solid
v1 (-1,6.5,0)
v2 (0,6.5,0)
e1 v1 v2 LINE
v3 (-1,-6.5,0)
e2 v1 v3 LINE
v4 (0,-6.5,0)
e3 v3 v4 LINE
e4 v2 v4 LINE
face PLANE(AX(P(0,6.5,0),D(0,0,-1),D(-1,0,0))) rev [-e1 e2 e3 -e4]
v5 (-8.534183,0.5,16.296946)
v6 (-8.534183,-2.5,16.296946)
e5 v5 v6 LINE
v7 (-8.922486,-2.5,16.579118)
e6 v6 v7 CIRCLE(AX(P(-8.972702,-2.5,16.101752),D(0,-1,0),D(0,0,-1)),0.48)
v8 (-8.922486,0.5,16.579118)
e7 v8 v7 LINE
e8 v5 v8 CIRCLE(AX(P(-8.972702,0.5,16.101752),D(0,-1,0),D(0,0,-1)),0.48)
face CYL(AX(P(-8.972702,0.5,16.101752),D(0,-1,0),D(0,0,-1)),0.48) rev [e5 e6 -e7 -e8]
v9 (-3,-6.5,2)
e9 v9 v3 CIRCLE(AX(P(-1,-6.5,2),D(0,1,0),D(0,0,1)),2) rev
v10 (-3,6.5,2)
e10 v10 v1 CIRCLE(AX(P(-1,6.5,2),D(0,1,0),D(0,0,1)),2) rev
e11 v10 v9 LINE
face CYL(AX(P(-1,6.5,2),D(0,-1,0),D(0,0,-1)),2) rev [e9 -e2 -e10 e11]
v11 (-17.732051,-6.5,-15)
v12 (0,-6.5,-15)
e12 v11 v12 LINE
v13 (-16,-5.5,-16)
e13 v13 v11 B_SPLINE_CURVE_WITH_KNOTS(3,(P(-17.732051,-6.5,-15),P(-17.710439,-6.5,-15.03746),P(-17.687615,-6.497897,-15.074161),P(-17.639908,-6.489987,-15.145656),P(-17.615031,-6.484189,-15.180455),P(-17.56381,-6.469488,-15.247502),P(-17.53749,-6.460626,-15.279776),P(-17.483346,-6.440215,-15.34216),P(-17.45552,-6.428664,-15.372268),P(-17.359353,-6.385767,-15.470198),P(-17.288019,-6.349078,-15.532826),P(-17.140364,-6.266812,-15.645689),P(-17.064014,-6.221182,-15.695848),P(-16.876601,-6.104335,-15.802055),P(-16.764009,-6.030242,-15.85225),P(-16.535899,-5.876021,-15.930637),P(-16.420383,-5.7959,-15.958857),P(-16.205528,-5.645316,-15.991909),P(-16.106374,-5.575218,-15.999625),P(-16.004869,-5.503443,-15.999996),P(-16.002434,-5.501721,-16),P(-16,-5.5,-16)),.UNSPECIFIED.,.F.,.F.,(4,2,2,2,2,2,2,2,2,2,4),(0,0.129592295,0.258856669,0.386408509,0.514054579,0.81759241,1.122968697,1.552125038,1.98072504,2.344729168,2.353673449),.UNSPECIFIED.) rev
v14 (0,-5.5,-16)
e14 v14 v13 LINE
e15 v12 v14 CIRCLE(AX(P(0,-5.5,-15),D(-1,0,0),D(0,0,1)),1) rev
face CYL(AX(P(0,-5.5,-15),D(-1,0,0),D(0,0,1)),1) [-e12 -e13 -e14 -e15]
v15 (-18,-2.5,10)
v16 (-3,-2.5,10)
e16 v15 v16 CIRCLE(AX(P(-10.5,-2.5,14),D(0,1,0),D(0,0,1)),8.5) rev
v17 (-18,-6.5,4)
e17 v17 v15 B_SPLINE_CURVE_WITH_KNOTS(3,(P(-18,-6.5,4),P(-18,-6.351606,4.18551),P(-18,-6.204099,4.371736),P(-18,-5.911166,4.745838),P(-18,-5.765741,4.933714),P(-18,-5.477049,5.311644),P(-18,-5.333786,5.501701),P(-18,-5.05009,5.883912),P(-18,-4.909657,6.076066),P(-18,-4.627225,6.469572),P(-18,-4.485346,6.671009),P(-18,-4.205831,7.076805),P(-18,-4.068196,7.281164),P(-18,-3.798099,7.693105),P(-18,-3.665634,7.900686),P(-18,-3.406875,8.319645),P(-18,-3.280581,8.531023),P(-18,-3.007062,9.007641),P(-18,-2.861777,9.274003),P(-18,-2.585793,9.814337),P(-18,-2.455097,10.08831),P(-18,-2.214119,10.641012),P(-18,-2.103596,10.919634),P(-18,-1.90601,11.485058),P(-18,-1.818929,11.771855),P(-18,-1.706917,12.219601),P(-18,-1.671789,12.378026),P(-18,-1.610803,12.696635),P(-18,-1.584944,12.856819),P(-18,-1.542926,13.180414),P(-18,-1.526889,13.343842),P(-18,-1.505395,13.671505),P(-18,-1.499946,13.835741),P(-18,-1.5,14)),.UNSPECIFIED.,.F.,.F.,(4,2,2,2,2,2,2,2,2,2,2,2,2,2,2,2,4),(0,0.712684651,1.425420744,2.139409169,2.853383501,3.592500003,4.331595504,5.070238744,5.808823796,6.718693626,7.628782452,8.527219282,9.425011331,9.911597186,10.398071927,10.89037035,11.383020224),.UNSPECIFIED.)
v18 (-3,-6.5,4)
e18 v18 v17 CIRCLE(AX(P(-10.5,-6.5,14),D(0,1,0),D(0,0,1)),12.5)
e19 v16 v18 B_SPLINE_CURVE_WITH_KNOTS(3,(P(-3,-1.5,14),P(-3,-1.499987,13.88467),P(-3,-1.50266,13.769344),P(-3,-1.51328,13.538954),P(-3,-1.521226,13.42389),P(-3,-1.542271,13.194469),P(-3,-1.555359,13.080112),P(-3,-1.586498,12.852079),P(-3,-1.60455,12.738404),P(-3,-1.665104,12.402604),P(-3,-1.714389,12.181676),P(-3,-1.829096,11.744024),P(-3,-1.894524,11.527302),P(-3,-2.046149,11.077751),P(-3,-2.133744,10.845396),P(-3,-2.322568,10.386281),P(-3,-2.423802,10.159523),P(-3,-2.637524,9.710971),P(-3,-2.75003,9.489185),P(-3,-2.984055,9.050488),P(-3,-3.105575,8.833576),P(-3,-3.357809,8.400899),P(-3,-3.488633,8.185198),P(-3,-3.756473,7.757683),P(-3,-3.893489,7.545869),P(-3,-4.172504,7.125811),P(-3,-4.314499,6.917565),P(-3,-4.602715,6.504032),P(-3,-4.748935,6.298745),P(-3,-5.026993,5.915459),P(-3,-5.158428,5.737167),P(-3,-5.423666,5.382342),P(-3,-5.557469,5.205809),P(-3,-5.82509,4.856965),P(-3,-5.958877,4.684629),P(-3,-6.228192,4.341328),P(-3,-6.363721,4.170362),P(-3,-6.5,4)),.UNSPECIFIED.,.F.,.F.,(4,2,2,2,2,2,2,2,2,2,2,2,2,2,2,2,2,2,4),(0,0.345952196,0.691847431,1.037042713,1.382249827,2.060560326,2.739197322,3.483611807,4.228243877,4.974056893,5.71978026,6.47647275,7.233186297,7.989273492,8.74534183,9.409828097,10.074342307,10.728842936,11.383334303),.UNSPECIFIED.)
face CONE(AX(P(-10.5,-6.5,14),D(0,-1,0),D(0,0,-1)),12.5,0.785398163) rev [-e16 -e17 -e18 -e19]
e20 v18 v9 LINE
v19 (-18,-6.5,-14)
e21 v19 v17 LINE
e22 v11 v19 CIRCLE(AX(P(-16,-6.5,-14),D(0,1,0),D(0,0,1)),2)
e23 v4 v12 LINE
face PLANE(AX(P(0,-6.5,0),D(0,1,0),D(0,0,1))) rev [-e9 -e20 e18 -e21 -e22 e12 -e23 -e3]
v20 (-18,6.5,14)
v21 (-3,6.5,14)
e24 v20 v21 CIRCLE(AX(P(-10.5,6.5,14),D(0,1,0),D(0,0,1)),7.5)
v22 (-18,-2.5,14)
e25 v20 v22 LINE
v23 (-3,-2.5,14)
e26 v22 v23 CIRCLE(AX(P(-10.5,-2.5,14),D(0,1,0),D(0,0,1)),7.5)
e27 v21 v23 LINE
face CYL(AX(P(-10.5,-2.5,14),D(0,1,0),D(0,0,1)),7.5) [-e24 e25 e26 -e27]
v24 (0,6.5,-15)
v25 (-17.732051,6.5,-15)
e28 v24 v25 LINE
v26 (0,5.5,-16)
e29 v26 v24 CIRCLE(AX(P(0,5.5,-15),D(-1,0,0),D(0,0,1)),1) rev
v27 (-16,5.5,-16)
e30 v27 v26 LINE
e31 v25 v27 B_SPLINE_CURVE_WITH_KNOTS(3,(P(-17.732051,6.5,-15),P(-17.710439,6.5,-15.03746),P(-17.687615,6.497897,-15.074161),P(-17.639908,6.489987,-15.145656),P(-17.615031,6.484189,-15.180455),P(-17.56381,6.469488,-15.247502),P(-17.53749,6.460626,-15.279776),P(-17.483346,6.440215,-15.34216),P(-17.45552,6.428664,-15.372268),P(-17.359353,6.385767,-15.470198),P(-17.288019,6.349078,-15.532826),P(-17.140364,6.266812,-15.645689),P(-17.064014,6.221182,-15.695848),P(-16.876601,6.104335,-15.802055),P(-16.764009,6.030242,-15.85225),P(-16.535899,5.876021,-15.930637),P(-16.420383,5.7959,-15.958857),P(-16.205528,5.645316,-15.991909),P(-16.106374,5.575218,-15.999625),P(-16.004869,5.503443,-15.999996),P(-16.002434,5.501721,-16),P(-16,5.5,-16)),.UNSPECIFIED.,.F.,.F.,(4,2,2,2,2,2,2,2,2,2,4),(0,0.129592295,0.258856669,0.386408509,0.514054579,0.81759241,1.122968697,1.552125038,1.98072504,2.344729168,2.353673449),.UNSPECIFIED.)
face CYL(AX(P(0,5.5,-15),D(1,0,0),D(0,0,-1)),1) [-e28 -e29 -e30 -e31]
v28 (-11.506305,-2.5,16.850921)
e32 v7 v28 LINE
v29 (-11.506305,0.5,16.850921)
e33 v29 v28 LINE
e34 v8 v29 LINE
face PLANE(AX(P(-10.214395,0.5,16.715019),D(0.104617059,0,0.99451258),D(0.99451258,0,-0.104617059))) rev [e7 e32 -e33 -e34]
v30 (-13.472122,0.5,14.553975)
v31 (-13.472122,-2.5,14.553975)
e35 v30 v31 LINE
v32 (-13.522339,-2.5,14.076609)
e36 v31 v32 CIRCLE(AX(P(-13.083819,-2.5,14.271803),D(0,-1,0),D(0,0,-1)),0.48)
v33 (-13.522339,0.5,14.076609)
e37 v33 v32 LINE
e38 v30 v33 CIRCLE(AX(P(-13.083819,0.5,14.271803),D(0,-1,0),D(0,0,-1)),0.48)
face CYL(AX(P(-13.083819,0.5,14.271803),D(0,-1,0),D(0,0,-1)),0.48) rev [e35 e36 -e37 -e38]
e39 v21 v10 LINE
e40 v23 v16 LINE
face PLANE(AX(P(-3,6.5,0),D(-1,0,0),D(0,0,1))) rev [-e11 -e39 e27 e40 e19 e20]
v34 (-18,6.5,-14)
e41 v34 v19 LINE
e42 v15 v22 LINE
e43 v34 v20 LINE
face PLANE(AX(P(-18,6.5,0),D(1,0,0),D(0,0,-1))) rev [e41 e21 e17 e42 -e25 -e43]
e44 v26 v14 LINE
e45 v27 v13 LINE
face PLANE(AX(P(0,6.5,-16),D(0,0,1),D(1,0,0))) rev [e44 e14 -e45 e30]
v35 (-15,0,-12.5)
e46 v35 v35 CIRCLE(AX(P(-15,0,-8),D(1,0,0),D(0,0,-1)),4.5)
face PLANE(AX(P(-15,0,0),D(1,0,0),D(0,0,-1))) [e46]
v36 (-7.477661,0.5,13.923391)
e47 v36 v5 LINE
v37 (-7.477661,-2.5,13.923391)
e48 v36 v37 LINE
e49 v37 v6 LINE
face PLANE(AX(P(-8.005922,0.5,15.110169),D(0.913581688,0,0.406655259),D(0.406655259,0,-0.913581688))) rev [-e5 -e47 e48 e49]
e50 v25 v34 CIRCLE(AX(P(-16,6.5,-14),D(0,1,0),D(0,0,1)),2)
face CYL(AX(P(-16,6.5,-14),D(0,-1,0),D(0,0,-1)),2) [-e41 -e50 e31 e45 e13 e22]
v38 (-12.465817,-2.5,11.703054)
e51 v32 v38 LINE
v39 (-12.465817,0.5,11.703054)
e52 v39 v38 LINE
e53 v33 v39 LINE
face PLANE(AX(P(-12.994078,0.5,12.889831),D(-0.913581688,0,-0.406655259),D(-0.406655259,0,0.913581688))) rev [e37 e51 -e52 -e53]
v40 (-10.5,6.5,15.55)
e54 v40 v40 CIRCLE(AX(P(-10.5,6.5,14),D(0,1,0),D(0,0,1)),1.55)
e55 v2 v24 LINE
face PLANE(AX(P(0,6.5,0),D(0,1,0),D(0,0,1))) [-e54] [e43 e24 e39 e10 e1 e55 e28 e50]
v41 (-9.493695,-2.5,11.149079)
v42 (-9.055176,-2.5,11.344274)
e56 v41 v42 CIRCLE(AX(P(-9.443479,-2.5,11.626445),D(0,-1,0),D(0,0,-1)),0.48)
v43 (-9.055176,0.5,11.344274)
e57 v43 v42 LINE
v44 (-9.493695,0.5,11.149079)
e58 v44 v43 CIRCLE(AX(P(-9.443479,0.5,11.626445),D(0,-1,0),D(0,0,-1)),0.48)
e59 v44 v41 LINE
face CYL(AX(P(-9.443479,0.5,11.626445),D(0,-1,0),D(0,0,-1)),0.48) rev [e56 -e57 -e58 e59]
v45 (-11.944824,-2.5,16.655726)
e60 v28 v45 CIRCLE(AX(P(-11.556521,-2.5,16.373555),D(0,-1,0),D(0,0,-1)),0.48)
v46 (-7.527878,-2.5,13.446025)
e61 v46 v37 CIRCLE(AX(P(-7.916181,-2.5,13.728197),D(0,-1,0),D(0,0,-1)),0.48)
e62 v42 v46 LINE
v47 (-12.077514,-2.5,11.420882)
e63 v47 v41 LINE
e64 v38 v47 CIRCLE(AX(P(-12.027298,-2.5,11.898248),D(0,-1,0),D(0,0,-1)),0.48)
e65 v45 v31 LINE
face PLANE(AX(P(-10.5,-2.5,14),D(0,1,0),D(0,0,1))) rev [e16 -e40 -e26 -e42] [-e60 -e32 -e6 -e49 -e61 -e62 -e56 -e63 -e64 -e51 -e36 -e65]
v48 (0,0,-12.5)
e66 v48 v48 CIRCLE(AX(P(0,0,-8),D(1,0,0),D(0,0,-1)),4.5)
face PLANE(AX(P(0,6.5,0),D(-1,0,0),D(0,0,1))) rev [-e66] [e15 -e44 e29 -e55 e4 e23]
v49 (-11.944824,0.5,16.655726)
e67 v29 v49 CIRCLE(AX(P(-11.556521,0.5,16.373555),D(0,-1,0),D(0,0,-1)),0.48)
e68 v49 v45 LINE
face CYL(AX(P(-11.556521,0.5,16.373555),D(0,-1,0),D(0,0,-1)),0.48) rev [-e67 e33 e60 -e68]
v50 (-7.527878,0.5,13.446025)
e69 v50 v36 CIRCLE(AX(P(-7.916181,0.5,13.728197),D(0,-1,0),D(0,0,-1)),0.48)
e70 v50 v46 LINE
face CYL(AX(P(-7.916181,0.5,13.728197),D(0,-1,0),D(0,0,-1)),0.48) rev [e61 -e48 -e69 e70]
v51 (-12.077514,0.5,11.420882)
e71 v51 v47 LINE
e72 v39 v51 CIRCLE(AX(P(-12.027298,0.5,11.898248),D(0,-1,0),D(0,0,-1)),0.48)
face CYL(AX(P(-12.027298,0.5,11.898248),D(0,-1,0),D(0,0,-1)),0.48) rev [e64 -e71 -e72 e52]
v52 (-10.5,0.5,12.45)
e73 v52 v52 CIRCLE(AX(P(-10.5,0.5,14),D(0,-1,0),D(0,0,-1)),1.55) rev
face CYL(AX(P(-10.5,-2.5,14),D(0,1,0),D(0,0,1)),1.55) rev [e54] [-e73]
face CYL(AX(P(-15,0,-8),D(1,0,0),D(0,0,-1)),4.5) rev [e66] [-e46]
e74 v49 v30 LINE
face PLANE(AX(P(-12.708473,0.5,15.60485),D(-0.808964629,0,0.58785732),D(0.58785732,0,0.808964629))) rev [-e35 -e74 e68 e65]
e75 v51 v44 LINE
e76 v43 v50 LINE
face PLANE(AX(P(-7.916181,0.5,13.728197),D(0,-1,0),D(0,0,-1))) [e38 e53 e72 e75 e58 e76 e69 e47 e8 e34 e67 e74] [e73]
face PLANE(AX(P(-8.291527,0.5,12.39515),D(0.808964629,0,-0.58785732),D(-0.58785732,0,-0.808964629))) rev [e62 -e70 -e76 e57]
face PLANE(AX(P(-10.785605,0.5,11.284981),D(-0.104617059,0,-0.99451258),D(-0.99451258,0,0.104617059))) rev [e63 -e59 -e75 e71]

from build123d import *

# Parameters (mm, degrees)
BOSS_EXTRUDE1_DEPTH = 6.5
BOSS_EXTRUDE2_START = 6.5
SKETCH1_4_R         = 7.5
SKETCH1_4_R_2       = 1.55
BOSS_EXTRUDE2_DEPTH = 9
CUT_EXTRUDE1_DEPTH  = 15
CHAMFER1_SIZE       = 5
FILLET1_R           = 1
CUT_EXTRUDE2_DEPTH  = 3


with BuildPart() as part:
    # Sketch1 → Boss-Extrude1 (new, symmetric)
    with BuildSketch(Plane(origin=(0, 0, 0), x_dir=(1, 0, 0), z_dir=(0, 1, 0))):
        with BuildLine():
            Line((-1, 0), (0, 0))
            Line((0, 0), (0, 16))
            Line((0, 16), (-16, 16))
            ThreePointArc((-16, 16), (-17.414213562, 15.414213562), (-18, 14))
            Line((-18, 14), (-18, -14))
            ThreePointArc((-18, -14), (-10.5, -6.5), (-3, -14))
            Line((-3, -14), (-3, -2))
            ThreePointArc((-3, -2), (-2.414213562, -0.585786438), (-1, 0))
        make_face()
    extrude(amount=BOSS_EXTRUDE1_DEPTH, both=True)

    # Sketch1<4> → Boss-Extrude2 (add)
    with BuildSketch(Plane(origin=(0, 0, 0), x_dir=(1, 0, 0), z_dir=(0, 1, 0)).offset(BOSS_EXTRUDE2_START)):
        with Locations((-10.5, -14)):
            Circle(SKETCH1_4_R)
        with Locations(Location((-10.5, -14, 0), (0, 0, 270))):
            Circle(SKETCH1_4_R_2, mode=Mode.SUBTRACT)
    extrude(amount=-BOSS_EXTRUDE2_DEPTH)

    # Sketch2 → Cut-Extrude1 (cut)
    with BuildSketch(Plane(origin=(0, 0, 0), x_dir=(0, 0, -1), z_dir=(1, 0, 0))):
        with BuildLine():
            ThreePointArc((12.5, 0), (9.505604778, 4.240654932), (4.507486999, 2.837666813))
            Line((4.507486999, 2.837666813), (11.492513001, -2.837666813))
            ThreePointArc((11.492513001, -2.837666813), (12.240654932, -1.505604778), (12.5, 0))
        make_face()
        with BuildLine():
            Line((11.492513001, -2.837666813), (4.507486999, 2.837666813))
            ThreePointArc((4.507486999, 2.837666813), (5.162333187, -3.492513001), (11.492513001, -2.837666813))
        make_face()
    extrude(amount=-CUT_EXTRUDE1_DEPTH, mode=Mode.SUBTRACT)

    # Chamfer1
    # the kernel refuses this chamfer: 5 mm, written as the material it takes off along each edge
    with BuildSketch(Plane(origin=(-10.5, -6.5, 14), x_dir=(-0.003141587485879666, 0, 0.9999950652018581), z_dir=(0.9999950652018581, 0, 0.003141587485879666))) as chamfer1_piece_1_section:
        Polygon((7.5 + CHAMFER1_SIZE, 0), (7.5, -CHAMFER1_SIZE), (7.5, 0), align=None)
    chamfer1_piece_1 = revolve(axis=Axis((-10.5, -6.5, 14), (0, -1, 0)), revolution_arc=359.64, mode=Mode.PRIVATE)
    chamfer1_piece_1 = split(chamfer1_piece_1, bisect_by=Plane(origin=(-3, -4.630818152, 8.578188697), z_dir=(-1, 0, 0)), keep=Keep.TOP, mode=Mode.PRIVATE)
    chamfer1_piece_1 = split(chamfer1_piece_1, bisect_by=Plane(origin=(-19.50426243, -2.5, 8.578188697), z_dir=(0, -1, 0)), keep=Keep.TOP, mode=Mode.PRIVATE)
    add(chamfer1_piece_1, mode=Mode.SUBTRACT)
    with BuildSketch(Plane(origin=(-10.5, -6.5, 14), x_dir=(-0.003141587485879666, 0, 0.9999950652018581), z_dir=(0.9999950652018581, 0, 0.003141587485879666))) as chamfer1_piece_2_section:
        Polygon((7.5 + CHAMFER1_SIZE, 0), (7.5, -CHAMFER1_SIZE), (7.5, 0), align=None)
    chamfer1_piece_2 = revolve(axis=Axis((-10.5, -6.5, 14), (0, -1, 0)), revolution_arc=359.64, mode=Mode.PRIVATE)
    chamfer1_piece_2 = split(chamfer1_piece_2, bisect_by=Plane(origin=(-3, -5.259335852, 13.999999991), z_dir=(1, 0, 0)), keep=Keep.TOP, mode=Mode.PRIVATE)
    chamfer1_piece_2 = split(chamfer1_piece_2, bisect_by=Plane(origin=(-1.451043379, -2.5, 13.999999991), z_dir=(0, -1, 0)), keep=Keep.TOP, mode=Mode.PRIVATE)
    add(chamfer1_piece_2, mode=Mode.SUBTRACT)

    # Fillet1
    # the kernel refuses this fillet: 1 mm, written as the material it takes off along each edge
    with BuildSketch(Plane(origin=(2.5, -6.5, -16), x_dir=(0, 0, 1), z_dir=(-1, 0, 0)), Plane(origin=(2.5, 6.5, -16), x_dir=(0, -1, 0), z_dir=(-1, 0, 0))) as fillet1_piece_1:
        with BuildLine():
            CenterArc((FILLET1_R, FILLET1_R), FILLET1_R, 180, 90)
            Line((0, FILLET1_R), (0, 0))
            Line((0, 0), (FILLET1_R, 0))
        make_face()
    extrude(amount=21, mode=Mode.SUBTRACT)

    # Sketch3 → Cut-Extrude2 (cut)
    with BuildSketch(Plane.XZ.offset(2.5)):
        with BuildLine():
            Line((-7.477661315, 13.923391433), (-8.005921993, 15.110168858))
            Line((-8.005921993, 15.110168858), (-8.53418267, 16.296946283))
            ThreePointArc((-8.53418267, 16.296946283), (-8.690530367, 16.49005478), (-8.922485692, 16.579117797))
            Line((-8.922485692, 16.579117797), (-10.21439543, 16.715019342))
            Line((-10.21439543, 16.715019342), (-11.506305167, 16.850920888))
            ThreePointArc((-11.506305167, 16.850920888), (-11.75171588, 16.81207406), (-11.944824377, 16.655726364))
            Line((-11.944824377, 16.655726364), (-12.708473437, 15.604850484))
            Line((-12.708473437, 15.604850484), (-13.472122497, 14.553974605))
            ThreePointArc((-13.472122497, 14.553974605), (-13.561185513, 14.32201928), (-13.522338685, 14.076608567))
            Line((-13.522338685, 14.076608567), (-12.994078007, 12.889831142))
            Line((-12.994078007, 12.889831142), (-12.46581733, 11.703053717))
            ThreePointArc((-12.46581733, 11.703053717), (-12.309469633, 11.50994522), (-12.077514308, 11.420882203))
            Line((-12.077514308, 11.420882203), (-10.78560457, 11.284980658))
            Line((-10.78560457, 11.284980658), (-9.493694833, 11.149079112))
            ThreePointArc((-9.493694833, 11.149079112), (-9.24828412, 11.18792594), (-9.055175623, 11.344273636))
            Line((-9.055175623, 11.344273636), (-8.291526563, 12.395149516))
            Line((-8.291526563, 12.395149516), (-7.527877503, 13.446025395))
            ThreePointArc((-7.527877503, 13.446025395), (-7.438814487, 13.67798072), (-7.477661315, 13.923391433))
        make_face()
    extrude(amount=-CUT_EXTRUDE2_DEPTH, mode=Mode.SUBTRACT)


solid = part.part
